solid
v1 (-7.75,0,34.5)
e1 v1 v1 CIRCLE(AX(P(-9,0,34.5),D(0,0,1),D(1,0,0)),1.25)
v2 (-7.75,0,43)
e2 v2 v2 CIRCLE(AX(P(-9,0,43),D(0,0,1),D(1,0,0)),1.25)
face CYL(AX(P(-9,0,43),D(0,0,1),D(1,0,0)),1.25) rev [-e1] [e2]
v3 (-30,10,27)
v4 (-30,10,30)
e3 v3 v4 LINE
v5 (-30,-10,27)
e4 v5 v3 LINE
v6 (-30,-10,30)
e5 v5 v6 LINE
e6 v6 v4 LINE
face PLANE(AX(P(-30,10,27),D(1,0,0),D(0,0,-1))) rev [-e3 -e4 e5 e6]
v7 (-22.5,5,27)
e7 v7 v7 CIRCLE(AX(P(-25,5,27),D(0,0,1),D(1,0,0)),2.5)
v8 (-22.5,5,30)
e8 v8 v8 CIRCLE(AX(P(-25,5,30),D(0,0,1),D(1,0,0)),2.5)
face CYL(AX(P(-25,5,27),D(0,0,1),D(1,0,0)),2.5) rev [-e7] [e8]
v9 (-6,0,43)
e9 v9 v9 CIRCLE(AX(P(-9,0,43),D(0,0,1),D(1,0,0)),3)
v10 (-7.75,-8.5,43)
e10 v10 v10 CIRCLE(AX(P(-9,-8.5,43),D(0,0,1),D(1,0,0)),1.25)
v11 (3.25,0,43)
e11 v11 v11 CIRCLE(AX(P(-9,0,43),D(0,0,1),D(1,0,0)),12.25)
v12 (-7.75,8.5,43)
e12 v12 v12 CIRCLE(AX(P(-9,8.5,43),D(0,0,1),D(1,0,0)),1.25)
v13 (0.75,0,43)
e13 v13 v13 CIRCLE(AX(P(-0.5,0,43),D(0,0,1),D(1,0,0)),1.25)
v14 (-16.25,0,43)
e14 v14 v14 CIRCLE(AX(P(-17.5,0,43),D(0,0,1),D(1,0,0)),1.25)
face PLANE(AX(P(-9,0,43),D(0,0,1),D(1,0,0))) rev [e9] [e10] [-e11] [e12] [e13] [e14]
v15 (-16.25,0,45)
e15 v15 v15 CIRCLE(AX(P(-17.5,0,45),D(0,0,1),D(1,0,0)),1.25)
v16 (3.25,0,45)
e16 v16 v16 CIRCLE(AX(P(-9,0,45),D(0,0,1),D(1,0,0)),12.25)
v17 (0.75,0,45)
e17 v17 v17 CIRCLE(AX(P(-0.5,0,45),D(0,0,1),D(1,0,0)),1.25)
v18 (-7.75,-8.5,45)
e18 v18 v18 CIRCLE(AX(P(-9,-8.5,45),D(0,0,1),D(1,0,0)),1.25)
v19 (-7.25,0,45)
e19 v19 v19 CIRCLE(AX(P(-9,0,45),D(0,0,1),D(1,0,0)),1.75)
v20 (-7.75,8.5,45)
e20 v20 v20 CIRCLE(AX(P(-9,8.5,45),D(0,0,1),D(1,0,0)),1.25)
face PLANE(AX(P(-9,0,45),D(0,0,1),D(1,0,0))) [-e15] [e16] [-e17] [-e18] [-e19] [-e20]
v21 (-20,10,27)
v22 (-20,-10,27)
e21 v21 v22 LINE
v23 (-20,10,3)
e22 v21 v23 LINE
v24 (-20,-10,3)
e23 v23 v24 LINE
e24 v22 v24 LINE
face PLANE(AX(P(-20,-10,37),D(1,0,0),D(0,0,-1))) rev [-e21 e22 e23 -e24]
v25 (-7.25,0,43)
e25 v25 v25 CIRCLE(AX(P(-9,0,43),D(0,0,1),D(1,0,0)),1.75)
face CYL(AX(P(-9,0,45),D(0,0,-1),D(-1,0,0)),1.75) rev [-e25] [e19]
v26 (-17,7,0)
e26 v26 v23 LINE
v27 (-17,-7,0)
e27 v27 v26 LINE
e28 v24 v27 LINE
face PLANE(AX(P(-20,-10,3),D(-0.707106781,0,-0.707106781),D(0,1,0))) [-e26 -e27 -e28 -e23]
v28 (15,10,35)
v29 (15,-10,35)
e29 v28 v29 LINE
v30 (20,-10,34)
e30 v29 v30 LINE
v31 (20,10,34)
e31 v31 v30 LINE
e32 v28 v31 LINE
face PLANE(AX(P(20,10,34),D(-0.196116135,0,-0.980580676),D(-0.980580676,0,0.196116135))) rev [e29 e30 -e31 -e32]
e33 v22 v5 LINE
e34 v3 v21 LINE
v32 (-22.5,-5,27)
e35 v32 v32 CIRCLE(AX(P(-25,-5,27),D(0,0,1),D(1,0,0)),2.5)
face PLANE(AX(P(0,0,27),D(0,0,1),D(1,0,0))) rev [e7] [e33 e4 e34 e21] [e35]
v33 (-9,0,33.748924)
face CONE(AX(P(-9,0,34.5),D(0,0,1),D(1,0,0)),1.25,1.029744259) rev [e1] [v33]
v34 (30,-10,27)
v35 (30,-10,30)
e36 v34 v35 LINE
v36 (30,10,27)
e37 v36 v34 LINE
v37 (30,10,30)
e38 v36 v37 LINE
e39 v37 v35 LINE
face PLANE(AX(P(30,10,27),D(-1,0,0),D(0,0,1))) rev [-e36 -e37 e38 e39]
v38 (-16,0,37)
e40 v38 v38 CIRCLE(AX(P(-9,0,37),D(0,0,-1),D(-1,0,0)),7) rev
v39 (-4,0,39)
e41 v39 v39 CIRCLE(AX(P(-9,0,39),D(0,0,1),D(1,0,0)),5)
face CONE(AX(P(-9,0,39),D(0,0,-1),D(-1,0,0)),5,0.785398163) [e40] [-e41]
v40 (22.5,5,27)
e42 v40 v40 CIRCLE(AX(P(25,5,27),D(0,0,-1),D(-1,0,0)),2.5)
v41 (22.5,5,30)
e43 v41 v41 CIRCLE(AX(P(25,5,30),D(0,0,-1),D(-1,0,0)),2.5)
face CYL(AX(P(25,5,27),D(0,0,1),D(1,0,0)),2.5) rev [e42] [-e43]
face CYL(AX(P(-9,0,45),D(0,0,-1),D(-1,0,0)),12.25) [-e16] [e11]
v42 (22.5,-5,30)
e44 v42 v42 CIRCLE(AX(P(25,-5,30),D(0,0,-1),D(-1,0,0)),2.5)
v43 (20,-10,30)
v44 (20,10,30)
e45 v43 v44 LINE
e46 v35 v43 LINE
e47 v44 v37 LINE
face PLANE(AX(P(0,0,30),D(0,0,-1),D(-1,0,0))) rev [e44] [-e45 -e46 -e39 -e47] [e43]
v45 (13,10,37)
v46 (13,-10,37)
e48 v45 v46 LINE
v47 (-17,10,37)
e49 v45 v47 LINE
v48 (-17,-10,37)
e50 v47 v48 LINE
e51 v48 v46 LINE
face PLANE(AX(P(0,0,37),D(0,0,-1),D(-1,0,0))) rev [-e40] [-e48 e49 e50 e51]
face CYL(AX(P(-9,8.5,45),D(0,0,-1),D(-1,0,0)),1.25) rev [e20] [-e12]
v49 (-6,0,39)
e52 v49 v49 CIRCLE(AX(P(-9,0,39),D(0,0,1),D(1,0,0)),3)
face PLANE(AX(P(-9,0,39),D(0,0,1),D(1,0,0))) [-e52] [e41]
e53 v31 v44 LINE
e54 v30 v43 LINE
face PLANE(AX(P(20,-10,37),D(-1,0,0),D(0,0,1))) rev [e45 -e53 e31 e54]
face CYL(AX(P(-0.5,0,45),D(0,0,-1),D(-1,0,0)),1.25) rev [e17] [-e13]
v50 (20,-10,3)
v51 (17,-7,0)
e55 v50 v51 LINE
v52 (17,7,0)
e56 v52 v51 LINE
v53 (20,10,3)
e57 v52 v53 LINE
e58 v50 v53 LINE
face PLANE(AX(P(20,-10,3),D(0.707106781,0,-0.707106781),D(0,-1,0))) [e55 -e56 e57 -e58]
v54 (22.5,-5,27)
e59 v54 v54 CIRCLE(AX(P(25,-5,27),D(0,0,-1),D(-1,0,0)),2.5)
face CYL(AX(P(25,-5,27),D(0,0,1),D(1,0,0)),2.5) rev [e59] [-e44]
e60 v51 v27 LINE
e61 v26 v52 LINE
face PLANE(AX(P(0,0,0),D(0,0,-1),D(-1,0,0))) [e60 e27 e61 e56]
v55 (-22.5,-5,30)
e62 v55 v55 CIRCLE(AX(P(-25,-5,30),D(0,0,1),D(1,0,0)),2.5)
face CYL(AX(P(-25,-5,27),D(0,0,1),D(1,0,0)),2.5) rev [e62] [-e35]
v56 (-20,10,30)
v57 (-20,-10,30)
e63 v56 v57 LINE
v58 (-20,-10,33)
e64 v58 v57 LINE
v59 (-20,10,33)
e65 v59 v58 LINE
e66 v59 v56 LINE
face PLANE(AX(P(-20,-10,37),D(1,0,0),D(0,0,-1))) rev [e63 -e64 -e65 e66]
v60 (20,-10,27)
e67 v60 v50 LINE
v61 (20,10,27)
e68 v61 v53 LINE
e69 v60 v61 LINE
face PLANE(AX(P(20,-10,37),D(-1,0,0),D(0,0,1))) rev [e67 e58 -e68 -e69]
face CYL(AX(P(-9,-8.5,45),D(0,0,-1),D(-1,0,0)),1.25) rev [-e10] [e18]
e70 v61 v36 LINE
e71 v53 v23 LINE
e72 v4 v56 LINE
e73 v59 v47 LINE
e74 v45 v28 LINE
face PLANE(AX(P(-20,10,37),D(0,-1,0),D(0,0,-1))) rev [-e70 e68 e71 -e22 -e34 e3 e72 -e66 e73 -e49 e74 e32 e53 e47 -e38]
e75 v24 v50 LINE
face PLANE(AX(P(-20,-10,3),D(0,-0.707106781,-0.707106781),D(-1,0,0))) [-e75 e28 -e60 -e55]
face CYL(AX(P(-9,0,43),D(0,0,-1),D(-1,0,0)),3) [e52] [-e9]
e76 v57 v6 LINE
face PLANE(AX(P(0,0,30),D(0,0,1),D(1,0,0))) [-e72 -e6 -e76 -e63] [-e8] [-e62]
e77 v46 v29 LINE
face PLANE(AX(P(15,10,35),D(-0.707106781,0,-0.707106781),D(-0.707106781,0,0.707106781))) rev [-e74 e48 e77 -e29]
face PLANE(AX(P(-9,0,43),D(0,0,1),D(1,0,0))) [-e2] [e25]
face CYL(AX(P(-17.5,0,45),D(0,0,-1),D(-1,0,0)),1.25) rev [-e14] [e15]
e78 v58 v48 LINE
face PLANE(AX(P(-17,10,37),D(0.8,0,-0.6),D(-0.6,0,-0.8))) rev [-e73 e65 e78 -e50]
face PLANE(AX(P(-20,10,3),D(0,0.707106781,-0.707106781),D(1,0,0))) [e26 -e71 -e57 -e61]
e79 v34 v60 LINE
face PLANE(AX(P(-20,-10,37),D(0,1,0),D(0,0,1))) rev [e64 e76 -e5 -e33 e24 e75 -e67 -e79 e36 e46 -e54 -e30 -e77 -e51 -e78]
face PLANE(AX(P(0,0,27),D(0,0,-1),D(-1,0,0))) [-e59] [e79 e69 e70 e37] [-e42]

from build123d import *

# Parameters (mm, degrees)
SKETCH_1_W             = 40
SKETCH_1_H             = 20
EXTRUDE_1_DEPTH        = 37
CUT_EXTRUDE_1_DEPTH    = 47.572524089
CUT_EXTRUDE_2_DEPTH    = 47.572524089
CHAMFER_1_SIZE         = 3
SKETCH_4_R             = 7
EXTRUDE_2_DEPTH        = 2
CHAMFER_2_SIZE         = 2
SKETCH_5_R             = 3
EXTRUDE_3_DEPTH        = 4
SKETCH_6_W             = 10
SKETCH_6_H             = 20
EXTRUDE_4_DEPTH        = 3
SKETCH_7_R             = 2.5
CUT_EXTRUDE_3_DEPTH    = 3
HOLE_WIZARD_M3_1_D     = 2.5
HOLE_WIZARD_M3_1_DEPTH = 8.5
HOLE_WIZARD_M3_1_TIP   = 0.751075774
SKETCH_10_R            = 12.25
SKETCH_10_R_2          = 1.25
SKETCH_10_R_3          = 1.75
EXTRUDE_5_DEPTH        = 2


with BuildPart() as part:
    # 草图1 → 凸台-拉伸1 (new body)
    with BuildSketch(Plane.XY):
        Rectangle(SKETCH_1_W, SKETCH_1_H)
    extrude(amount=EXTRUDE_1_DEPTH)

    # 草图2 → 切除-拉伸1 (cut, through all)
    with BuildSketch(Plane.XZ.offset(10)):
        Polygon((20, 34), (15, 35), (13, 37), (20, 37), align=None)
    extrude(amount=-CUT_EXTRUDE_1_DEPTH, mode=Mode.SUBTRACT)

    # 草图3 → 切除-拉伸2 (cut, through all)
    with BuildSketch(Plane.XZ.offset(10)):
        Polygon((-20, 37), (-17, 37), (-20, 33), align=None)
    extrude(amount=-CUT_EXTRUDE_2_DEPTH, mode=Mode.SUBTRACT)

    # 倒角1
    chamfer_1_edges = [part.edges().sort_by_distance(p)[0] for p in [
        (0, -10, 0),
        (-20, 0, 0),
        (0, 10, 0),
        (20, 0, 0),
    ]]
    chamfer(chamfer_1_edges, length=CHAMFER_1_SIZE)

    # 草图4 → 凸台-拉伸2 (add)
    with BuildSketch(Plane.XY.offset(37)):
        with Locations(Location((-9, 0, 0), (0, 0, 180))):
            Circle(SKETCH_4_R)
    extrude(amount=EXTRUDE_2_DEPTH)

    # 倒角2
    chamfer_2_edges = [part.edges().sort_by_distance(p)[0] for p in [
        (-2, 0, 39),
    ]]
    chamfer(chamfer_2_edges, length=CHAMFER_2_SIZE - 0.0001)  # a hair under: the kernel refuses the full size

    # 草图5 → 凸台-拉伸3 (add)
    with BuildSketch(Plane.XY.offset(39)):
        with Locations((-9, 0)):
            Circle(SKETCH_5_R)
    extrude(amount=EXTRUDE_3_DEPTH)

    # 草图6 → 凸台-拉伸4 (add)
    with BuildSketch(Plane(origin=(0, 0, 30), x_dir=(-1, 0, 0), z_dir=(0, 0, -1))):
        with Locations((25, 0)):
            Rectangle(SKETCH_6_W, SKETCH_6_H)
        with Locations((-25, 0)):
            Rectangle(SKETCH_6_W, SKETCH_6_H)
    extrude(amount=EXTRUDE_4_DEPTH)

    # 草图7 → 切除-拉伸3 (cut)
    with BuildSketch(Plane.XY.offset(30)):
        with Locations((-25, 5)):
            Circle(SKETCH_7_R)
        with Locations((-25, -5)):
            Circle(SKETCH_7_R)
    cut_extrude_3 = extrude(amount=-CUT_EXTRUDE_3_DEPTH, mode=Mode.SUBTRACT)

    # 镜向1: 切除-拉伸3 across plane
    add(cut_extrude_3.mirror(Plane(origin=(0, 0, 0), x_dir=(0, 0, 1), z_dir=(1, 0, 0))), mode=Mode.SUBTRACT)

    # M3 螺纹孔1
    with Locations(Plane.XY.offset(43)):
        with Locations((-9, 0)):
            Hole(HOLE_WIZARD_M3_1_D / 2, depth=HOLE_WIZARD_M3_1_DEPTH)
            with Locations((0, 0, -(HOLE_WIZARD_M3_1_DEPTH + HOLE_WIZARD_M3_1_TIP / 2))):  # 118° drill point
                Cone(0, HOLE_WIZARD_M3_1_D / 2, HOLE_WIZARD_M3_1_TIP, mode=Mode.SUBTRACT)

    # 草图10 → 凸台-拉伸5 (add)
    with BuildSketch(Plane.XY.offset(43)):
        with Locations((-9, 0)):
            Circle(SKETCH_10_R)
        with Locations((-9, 8.5)):
            Circle(SKETCH_10_R_2, mode=Mode.SUBTRACT)
        with Locations((-0.5, 0)):
            Circle(SKETCH_10_R_2, mode=Mode.SUBTRACT)
        with Locations((-9, -8.5)):
            Circle(SKETCH_10_R_2, mode=Mode.SUBTRACT)
        with Locations((-17.5, 0)):
            Circle(SKETCH_10_R_2, mode=Mode.SUBTRACT)
        with Locations((-9, 0)):
            Circle(SKETCH_10_R_3, mode=Mode.SUBTRACT)
    extrude(amount=EXTRUDE_5_DEPTH)


solid = part.part
